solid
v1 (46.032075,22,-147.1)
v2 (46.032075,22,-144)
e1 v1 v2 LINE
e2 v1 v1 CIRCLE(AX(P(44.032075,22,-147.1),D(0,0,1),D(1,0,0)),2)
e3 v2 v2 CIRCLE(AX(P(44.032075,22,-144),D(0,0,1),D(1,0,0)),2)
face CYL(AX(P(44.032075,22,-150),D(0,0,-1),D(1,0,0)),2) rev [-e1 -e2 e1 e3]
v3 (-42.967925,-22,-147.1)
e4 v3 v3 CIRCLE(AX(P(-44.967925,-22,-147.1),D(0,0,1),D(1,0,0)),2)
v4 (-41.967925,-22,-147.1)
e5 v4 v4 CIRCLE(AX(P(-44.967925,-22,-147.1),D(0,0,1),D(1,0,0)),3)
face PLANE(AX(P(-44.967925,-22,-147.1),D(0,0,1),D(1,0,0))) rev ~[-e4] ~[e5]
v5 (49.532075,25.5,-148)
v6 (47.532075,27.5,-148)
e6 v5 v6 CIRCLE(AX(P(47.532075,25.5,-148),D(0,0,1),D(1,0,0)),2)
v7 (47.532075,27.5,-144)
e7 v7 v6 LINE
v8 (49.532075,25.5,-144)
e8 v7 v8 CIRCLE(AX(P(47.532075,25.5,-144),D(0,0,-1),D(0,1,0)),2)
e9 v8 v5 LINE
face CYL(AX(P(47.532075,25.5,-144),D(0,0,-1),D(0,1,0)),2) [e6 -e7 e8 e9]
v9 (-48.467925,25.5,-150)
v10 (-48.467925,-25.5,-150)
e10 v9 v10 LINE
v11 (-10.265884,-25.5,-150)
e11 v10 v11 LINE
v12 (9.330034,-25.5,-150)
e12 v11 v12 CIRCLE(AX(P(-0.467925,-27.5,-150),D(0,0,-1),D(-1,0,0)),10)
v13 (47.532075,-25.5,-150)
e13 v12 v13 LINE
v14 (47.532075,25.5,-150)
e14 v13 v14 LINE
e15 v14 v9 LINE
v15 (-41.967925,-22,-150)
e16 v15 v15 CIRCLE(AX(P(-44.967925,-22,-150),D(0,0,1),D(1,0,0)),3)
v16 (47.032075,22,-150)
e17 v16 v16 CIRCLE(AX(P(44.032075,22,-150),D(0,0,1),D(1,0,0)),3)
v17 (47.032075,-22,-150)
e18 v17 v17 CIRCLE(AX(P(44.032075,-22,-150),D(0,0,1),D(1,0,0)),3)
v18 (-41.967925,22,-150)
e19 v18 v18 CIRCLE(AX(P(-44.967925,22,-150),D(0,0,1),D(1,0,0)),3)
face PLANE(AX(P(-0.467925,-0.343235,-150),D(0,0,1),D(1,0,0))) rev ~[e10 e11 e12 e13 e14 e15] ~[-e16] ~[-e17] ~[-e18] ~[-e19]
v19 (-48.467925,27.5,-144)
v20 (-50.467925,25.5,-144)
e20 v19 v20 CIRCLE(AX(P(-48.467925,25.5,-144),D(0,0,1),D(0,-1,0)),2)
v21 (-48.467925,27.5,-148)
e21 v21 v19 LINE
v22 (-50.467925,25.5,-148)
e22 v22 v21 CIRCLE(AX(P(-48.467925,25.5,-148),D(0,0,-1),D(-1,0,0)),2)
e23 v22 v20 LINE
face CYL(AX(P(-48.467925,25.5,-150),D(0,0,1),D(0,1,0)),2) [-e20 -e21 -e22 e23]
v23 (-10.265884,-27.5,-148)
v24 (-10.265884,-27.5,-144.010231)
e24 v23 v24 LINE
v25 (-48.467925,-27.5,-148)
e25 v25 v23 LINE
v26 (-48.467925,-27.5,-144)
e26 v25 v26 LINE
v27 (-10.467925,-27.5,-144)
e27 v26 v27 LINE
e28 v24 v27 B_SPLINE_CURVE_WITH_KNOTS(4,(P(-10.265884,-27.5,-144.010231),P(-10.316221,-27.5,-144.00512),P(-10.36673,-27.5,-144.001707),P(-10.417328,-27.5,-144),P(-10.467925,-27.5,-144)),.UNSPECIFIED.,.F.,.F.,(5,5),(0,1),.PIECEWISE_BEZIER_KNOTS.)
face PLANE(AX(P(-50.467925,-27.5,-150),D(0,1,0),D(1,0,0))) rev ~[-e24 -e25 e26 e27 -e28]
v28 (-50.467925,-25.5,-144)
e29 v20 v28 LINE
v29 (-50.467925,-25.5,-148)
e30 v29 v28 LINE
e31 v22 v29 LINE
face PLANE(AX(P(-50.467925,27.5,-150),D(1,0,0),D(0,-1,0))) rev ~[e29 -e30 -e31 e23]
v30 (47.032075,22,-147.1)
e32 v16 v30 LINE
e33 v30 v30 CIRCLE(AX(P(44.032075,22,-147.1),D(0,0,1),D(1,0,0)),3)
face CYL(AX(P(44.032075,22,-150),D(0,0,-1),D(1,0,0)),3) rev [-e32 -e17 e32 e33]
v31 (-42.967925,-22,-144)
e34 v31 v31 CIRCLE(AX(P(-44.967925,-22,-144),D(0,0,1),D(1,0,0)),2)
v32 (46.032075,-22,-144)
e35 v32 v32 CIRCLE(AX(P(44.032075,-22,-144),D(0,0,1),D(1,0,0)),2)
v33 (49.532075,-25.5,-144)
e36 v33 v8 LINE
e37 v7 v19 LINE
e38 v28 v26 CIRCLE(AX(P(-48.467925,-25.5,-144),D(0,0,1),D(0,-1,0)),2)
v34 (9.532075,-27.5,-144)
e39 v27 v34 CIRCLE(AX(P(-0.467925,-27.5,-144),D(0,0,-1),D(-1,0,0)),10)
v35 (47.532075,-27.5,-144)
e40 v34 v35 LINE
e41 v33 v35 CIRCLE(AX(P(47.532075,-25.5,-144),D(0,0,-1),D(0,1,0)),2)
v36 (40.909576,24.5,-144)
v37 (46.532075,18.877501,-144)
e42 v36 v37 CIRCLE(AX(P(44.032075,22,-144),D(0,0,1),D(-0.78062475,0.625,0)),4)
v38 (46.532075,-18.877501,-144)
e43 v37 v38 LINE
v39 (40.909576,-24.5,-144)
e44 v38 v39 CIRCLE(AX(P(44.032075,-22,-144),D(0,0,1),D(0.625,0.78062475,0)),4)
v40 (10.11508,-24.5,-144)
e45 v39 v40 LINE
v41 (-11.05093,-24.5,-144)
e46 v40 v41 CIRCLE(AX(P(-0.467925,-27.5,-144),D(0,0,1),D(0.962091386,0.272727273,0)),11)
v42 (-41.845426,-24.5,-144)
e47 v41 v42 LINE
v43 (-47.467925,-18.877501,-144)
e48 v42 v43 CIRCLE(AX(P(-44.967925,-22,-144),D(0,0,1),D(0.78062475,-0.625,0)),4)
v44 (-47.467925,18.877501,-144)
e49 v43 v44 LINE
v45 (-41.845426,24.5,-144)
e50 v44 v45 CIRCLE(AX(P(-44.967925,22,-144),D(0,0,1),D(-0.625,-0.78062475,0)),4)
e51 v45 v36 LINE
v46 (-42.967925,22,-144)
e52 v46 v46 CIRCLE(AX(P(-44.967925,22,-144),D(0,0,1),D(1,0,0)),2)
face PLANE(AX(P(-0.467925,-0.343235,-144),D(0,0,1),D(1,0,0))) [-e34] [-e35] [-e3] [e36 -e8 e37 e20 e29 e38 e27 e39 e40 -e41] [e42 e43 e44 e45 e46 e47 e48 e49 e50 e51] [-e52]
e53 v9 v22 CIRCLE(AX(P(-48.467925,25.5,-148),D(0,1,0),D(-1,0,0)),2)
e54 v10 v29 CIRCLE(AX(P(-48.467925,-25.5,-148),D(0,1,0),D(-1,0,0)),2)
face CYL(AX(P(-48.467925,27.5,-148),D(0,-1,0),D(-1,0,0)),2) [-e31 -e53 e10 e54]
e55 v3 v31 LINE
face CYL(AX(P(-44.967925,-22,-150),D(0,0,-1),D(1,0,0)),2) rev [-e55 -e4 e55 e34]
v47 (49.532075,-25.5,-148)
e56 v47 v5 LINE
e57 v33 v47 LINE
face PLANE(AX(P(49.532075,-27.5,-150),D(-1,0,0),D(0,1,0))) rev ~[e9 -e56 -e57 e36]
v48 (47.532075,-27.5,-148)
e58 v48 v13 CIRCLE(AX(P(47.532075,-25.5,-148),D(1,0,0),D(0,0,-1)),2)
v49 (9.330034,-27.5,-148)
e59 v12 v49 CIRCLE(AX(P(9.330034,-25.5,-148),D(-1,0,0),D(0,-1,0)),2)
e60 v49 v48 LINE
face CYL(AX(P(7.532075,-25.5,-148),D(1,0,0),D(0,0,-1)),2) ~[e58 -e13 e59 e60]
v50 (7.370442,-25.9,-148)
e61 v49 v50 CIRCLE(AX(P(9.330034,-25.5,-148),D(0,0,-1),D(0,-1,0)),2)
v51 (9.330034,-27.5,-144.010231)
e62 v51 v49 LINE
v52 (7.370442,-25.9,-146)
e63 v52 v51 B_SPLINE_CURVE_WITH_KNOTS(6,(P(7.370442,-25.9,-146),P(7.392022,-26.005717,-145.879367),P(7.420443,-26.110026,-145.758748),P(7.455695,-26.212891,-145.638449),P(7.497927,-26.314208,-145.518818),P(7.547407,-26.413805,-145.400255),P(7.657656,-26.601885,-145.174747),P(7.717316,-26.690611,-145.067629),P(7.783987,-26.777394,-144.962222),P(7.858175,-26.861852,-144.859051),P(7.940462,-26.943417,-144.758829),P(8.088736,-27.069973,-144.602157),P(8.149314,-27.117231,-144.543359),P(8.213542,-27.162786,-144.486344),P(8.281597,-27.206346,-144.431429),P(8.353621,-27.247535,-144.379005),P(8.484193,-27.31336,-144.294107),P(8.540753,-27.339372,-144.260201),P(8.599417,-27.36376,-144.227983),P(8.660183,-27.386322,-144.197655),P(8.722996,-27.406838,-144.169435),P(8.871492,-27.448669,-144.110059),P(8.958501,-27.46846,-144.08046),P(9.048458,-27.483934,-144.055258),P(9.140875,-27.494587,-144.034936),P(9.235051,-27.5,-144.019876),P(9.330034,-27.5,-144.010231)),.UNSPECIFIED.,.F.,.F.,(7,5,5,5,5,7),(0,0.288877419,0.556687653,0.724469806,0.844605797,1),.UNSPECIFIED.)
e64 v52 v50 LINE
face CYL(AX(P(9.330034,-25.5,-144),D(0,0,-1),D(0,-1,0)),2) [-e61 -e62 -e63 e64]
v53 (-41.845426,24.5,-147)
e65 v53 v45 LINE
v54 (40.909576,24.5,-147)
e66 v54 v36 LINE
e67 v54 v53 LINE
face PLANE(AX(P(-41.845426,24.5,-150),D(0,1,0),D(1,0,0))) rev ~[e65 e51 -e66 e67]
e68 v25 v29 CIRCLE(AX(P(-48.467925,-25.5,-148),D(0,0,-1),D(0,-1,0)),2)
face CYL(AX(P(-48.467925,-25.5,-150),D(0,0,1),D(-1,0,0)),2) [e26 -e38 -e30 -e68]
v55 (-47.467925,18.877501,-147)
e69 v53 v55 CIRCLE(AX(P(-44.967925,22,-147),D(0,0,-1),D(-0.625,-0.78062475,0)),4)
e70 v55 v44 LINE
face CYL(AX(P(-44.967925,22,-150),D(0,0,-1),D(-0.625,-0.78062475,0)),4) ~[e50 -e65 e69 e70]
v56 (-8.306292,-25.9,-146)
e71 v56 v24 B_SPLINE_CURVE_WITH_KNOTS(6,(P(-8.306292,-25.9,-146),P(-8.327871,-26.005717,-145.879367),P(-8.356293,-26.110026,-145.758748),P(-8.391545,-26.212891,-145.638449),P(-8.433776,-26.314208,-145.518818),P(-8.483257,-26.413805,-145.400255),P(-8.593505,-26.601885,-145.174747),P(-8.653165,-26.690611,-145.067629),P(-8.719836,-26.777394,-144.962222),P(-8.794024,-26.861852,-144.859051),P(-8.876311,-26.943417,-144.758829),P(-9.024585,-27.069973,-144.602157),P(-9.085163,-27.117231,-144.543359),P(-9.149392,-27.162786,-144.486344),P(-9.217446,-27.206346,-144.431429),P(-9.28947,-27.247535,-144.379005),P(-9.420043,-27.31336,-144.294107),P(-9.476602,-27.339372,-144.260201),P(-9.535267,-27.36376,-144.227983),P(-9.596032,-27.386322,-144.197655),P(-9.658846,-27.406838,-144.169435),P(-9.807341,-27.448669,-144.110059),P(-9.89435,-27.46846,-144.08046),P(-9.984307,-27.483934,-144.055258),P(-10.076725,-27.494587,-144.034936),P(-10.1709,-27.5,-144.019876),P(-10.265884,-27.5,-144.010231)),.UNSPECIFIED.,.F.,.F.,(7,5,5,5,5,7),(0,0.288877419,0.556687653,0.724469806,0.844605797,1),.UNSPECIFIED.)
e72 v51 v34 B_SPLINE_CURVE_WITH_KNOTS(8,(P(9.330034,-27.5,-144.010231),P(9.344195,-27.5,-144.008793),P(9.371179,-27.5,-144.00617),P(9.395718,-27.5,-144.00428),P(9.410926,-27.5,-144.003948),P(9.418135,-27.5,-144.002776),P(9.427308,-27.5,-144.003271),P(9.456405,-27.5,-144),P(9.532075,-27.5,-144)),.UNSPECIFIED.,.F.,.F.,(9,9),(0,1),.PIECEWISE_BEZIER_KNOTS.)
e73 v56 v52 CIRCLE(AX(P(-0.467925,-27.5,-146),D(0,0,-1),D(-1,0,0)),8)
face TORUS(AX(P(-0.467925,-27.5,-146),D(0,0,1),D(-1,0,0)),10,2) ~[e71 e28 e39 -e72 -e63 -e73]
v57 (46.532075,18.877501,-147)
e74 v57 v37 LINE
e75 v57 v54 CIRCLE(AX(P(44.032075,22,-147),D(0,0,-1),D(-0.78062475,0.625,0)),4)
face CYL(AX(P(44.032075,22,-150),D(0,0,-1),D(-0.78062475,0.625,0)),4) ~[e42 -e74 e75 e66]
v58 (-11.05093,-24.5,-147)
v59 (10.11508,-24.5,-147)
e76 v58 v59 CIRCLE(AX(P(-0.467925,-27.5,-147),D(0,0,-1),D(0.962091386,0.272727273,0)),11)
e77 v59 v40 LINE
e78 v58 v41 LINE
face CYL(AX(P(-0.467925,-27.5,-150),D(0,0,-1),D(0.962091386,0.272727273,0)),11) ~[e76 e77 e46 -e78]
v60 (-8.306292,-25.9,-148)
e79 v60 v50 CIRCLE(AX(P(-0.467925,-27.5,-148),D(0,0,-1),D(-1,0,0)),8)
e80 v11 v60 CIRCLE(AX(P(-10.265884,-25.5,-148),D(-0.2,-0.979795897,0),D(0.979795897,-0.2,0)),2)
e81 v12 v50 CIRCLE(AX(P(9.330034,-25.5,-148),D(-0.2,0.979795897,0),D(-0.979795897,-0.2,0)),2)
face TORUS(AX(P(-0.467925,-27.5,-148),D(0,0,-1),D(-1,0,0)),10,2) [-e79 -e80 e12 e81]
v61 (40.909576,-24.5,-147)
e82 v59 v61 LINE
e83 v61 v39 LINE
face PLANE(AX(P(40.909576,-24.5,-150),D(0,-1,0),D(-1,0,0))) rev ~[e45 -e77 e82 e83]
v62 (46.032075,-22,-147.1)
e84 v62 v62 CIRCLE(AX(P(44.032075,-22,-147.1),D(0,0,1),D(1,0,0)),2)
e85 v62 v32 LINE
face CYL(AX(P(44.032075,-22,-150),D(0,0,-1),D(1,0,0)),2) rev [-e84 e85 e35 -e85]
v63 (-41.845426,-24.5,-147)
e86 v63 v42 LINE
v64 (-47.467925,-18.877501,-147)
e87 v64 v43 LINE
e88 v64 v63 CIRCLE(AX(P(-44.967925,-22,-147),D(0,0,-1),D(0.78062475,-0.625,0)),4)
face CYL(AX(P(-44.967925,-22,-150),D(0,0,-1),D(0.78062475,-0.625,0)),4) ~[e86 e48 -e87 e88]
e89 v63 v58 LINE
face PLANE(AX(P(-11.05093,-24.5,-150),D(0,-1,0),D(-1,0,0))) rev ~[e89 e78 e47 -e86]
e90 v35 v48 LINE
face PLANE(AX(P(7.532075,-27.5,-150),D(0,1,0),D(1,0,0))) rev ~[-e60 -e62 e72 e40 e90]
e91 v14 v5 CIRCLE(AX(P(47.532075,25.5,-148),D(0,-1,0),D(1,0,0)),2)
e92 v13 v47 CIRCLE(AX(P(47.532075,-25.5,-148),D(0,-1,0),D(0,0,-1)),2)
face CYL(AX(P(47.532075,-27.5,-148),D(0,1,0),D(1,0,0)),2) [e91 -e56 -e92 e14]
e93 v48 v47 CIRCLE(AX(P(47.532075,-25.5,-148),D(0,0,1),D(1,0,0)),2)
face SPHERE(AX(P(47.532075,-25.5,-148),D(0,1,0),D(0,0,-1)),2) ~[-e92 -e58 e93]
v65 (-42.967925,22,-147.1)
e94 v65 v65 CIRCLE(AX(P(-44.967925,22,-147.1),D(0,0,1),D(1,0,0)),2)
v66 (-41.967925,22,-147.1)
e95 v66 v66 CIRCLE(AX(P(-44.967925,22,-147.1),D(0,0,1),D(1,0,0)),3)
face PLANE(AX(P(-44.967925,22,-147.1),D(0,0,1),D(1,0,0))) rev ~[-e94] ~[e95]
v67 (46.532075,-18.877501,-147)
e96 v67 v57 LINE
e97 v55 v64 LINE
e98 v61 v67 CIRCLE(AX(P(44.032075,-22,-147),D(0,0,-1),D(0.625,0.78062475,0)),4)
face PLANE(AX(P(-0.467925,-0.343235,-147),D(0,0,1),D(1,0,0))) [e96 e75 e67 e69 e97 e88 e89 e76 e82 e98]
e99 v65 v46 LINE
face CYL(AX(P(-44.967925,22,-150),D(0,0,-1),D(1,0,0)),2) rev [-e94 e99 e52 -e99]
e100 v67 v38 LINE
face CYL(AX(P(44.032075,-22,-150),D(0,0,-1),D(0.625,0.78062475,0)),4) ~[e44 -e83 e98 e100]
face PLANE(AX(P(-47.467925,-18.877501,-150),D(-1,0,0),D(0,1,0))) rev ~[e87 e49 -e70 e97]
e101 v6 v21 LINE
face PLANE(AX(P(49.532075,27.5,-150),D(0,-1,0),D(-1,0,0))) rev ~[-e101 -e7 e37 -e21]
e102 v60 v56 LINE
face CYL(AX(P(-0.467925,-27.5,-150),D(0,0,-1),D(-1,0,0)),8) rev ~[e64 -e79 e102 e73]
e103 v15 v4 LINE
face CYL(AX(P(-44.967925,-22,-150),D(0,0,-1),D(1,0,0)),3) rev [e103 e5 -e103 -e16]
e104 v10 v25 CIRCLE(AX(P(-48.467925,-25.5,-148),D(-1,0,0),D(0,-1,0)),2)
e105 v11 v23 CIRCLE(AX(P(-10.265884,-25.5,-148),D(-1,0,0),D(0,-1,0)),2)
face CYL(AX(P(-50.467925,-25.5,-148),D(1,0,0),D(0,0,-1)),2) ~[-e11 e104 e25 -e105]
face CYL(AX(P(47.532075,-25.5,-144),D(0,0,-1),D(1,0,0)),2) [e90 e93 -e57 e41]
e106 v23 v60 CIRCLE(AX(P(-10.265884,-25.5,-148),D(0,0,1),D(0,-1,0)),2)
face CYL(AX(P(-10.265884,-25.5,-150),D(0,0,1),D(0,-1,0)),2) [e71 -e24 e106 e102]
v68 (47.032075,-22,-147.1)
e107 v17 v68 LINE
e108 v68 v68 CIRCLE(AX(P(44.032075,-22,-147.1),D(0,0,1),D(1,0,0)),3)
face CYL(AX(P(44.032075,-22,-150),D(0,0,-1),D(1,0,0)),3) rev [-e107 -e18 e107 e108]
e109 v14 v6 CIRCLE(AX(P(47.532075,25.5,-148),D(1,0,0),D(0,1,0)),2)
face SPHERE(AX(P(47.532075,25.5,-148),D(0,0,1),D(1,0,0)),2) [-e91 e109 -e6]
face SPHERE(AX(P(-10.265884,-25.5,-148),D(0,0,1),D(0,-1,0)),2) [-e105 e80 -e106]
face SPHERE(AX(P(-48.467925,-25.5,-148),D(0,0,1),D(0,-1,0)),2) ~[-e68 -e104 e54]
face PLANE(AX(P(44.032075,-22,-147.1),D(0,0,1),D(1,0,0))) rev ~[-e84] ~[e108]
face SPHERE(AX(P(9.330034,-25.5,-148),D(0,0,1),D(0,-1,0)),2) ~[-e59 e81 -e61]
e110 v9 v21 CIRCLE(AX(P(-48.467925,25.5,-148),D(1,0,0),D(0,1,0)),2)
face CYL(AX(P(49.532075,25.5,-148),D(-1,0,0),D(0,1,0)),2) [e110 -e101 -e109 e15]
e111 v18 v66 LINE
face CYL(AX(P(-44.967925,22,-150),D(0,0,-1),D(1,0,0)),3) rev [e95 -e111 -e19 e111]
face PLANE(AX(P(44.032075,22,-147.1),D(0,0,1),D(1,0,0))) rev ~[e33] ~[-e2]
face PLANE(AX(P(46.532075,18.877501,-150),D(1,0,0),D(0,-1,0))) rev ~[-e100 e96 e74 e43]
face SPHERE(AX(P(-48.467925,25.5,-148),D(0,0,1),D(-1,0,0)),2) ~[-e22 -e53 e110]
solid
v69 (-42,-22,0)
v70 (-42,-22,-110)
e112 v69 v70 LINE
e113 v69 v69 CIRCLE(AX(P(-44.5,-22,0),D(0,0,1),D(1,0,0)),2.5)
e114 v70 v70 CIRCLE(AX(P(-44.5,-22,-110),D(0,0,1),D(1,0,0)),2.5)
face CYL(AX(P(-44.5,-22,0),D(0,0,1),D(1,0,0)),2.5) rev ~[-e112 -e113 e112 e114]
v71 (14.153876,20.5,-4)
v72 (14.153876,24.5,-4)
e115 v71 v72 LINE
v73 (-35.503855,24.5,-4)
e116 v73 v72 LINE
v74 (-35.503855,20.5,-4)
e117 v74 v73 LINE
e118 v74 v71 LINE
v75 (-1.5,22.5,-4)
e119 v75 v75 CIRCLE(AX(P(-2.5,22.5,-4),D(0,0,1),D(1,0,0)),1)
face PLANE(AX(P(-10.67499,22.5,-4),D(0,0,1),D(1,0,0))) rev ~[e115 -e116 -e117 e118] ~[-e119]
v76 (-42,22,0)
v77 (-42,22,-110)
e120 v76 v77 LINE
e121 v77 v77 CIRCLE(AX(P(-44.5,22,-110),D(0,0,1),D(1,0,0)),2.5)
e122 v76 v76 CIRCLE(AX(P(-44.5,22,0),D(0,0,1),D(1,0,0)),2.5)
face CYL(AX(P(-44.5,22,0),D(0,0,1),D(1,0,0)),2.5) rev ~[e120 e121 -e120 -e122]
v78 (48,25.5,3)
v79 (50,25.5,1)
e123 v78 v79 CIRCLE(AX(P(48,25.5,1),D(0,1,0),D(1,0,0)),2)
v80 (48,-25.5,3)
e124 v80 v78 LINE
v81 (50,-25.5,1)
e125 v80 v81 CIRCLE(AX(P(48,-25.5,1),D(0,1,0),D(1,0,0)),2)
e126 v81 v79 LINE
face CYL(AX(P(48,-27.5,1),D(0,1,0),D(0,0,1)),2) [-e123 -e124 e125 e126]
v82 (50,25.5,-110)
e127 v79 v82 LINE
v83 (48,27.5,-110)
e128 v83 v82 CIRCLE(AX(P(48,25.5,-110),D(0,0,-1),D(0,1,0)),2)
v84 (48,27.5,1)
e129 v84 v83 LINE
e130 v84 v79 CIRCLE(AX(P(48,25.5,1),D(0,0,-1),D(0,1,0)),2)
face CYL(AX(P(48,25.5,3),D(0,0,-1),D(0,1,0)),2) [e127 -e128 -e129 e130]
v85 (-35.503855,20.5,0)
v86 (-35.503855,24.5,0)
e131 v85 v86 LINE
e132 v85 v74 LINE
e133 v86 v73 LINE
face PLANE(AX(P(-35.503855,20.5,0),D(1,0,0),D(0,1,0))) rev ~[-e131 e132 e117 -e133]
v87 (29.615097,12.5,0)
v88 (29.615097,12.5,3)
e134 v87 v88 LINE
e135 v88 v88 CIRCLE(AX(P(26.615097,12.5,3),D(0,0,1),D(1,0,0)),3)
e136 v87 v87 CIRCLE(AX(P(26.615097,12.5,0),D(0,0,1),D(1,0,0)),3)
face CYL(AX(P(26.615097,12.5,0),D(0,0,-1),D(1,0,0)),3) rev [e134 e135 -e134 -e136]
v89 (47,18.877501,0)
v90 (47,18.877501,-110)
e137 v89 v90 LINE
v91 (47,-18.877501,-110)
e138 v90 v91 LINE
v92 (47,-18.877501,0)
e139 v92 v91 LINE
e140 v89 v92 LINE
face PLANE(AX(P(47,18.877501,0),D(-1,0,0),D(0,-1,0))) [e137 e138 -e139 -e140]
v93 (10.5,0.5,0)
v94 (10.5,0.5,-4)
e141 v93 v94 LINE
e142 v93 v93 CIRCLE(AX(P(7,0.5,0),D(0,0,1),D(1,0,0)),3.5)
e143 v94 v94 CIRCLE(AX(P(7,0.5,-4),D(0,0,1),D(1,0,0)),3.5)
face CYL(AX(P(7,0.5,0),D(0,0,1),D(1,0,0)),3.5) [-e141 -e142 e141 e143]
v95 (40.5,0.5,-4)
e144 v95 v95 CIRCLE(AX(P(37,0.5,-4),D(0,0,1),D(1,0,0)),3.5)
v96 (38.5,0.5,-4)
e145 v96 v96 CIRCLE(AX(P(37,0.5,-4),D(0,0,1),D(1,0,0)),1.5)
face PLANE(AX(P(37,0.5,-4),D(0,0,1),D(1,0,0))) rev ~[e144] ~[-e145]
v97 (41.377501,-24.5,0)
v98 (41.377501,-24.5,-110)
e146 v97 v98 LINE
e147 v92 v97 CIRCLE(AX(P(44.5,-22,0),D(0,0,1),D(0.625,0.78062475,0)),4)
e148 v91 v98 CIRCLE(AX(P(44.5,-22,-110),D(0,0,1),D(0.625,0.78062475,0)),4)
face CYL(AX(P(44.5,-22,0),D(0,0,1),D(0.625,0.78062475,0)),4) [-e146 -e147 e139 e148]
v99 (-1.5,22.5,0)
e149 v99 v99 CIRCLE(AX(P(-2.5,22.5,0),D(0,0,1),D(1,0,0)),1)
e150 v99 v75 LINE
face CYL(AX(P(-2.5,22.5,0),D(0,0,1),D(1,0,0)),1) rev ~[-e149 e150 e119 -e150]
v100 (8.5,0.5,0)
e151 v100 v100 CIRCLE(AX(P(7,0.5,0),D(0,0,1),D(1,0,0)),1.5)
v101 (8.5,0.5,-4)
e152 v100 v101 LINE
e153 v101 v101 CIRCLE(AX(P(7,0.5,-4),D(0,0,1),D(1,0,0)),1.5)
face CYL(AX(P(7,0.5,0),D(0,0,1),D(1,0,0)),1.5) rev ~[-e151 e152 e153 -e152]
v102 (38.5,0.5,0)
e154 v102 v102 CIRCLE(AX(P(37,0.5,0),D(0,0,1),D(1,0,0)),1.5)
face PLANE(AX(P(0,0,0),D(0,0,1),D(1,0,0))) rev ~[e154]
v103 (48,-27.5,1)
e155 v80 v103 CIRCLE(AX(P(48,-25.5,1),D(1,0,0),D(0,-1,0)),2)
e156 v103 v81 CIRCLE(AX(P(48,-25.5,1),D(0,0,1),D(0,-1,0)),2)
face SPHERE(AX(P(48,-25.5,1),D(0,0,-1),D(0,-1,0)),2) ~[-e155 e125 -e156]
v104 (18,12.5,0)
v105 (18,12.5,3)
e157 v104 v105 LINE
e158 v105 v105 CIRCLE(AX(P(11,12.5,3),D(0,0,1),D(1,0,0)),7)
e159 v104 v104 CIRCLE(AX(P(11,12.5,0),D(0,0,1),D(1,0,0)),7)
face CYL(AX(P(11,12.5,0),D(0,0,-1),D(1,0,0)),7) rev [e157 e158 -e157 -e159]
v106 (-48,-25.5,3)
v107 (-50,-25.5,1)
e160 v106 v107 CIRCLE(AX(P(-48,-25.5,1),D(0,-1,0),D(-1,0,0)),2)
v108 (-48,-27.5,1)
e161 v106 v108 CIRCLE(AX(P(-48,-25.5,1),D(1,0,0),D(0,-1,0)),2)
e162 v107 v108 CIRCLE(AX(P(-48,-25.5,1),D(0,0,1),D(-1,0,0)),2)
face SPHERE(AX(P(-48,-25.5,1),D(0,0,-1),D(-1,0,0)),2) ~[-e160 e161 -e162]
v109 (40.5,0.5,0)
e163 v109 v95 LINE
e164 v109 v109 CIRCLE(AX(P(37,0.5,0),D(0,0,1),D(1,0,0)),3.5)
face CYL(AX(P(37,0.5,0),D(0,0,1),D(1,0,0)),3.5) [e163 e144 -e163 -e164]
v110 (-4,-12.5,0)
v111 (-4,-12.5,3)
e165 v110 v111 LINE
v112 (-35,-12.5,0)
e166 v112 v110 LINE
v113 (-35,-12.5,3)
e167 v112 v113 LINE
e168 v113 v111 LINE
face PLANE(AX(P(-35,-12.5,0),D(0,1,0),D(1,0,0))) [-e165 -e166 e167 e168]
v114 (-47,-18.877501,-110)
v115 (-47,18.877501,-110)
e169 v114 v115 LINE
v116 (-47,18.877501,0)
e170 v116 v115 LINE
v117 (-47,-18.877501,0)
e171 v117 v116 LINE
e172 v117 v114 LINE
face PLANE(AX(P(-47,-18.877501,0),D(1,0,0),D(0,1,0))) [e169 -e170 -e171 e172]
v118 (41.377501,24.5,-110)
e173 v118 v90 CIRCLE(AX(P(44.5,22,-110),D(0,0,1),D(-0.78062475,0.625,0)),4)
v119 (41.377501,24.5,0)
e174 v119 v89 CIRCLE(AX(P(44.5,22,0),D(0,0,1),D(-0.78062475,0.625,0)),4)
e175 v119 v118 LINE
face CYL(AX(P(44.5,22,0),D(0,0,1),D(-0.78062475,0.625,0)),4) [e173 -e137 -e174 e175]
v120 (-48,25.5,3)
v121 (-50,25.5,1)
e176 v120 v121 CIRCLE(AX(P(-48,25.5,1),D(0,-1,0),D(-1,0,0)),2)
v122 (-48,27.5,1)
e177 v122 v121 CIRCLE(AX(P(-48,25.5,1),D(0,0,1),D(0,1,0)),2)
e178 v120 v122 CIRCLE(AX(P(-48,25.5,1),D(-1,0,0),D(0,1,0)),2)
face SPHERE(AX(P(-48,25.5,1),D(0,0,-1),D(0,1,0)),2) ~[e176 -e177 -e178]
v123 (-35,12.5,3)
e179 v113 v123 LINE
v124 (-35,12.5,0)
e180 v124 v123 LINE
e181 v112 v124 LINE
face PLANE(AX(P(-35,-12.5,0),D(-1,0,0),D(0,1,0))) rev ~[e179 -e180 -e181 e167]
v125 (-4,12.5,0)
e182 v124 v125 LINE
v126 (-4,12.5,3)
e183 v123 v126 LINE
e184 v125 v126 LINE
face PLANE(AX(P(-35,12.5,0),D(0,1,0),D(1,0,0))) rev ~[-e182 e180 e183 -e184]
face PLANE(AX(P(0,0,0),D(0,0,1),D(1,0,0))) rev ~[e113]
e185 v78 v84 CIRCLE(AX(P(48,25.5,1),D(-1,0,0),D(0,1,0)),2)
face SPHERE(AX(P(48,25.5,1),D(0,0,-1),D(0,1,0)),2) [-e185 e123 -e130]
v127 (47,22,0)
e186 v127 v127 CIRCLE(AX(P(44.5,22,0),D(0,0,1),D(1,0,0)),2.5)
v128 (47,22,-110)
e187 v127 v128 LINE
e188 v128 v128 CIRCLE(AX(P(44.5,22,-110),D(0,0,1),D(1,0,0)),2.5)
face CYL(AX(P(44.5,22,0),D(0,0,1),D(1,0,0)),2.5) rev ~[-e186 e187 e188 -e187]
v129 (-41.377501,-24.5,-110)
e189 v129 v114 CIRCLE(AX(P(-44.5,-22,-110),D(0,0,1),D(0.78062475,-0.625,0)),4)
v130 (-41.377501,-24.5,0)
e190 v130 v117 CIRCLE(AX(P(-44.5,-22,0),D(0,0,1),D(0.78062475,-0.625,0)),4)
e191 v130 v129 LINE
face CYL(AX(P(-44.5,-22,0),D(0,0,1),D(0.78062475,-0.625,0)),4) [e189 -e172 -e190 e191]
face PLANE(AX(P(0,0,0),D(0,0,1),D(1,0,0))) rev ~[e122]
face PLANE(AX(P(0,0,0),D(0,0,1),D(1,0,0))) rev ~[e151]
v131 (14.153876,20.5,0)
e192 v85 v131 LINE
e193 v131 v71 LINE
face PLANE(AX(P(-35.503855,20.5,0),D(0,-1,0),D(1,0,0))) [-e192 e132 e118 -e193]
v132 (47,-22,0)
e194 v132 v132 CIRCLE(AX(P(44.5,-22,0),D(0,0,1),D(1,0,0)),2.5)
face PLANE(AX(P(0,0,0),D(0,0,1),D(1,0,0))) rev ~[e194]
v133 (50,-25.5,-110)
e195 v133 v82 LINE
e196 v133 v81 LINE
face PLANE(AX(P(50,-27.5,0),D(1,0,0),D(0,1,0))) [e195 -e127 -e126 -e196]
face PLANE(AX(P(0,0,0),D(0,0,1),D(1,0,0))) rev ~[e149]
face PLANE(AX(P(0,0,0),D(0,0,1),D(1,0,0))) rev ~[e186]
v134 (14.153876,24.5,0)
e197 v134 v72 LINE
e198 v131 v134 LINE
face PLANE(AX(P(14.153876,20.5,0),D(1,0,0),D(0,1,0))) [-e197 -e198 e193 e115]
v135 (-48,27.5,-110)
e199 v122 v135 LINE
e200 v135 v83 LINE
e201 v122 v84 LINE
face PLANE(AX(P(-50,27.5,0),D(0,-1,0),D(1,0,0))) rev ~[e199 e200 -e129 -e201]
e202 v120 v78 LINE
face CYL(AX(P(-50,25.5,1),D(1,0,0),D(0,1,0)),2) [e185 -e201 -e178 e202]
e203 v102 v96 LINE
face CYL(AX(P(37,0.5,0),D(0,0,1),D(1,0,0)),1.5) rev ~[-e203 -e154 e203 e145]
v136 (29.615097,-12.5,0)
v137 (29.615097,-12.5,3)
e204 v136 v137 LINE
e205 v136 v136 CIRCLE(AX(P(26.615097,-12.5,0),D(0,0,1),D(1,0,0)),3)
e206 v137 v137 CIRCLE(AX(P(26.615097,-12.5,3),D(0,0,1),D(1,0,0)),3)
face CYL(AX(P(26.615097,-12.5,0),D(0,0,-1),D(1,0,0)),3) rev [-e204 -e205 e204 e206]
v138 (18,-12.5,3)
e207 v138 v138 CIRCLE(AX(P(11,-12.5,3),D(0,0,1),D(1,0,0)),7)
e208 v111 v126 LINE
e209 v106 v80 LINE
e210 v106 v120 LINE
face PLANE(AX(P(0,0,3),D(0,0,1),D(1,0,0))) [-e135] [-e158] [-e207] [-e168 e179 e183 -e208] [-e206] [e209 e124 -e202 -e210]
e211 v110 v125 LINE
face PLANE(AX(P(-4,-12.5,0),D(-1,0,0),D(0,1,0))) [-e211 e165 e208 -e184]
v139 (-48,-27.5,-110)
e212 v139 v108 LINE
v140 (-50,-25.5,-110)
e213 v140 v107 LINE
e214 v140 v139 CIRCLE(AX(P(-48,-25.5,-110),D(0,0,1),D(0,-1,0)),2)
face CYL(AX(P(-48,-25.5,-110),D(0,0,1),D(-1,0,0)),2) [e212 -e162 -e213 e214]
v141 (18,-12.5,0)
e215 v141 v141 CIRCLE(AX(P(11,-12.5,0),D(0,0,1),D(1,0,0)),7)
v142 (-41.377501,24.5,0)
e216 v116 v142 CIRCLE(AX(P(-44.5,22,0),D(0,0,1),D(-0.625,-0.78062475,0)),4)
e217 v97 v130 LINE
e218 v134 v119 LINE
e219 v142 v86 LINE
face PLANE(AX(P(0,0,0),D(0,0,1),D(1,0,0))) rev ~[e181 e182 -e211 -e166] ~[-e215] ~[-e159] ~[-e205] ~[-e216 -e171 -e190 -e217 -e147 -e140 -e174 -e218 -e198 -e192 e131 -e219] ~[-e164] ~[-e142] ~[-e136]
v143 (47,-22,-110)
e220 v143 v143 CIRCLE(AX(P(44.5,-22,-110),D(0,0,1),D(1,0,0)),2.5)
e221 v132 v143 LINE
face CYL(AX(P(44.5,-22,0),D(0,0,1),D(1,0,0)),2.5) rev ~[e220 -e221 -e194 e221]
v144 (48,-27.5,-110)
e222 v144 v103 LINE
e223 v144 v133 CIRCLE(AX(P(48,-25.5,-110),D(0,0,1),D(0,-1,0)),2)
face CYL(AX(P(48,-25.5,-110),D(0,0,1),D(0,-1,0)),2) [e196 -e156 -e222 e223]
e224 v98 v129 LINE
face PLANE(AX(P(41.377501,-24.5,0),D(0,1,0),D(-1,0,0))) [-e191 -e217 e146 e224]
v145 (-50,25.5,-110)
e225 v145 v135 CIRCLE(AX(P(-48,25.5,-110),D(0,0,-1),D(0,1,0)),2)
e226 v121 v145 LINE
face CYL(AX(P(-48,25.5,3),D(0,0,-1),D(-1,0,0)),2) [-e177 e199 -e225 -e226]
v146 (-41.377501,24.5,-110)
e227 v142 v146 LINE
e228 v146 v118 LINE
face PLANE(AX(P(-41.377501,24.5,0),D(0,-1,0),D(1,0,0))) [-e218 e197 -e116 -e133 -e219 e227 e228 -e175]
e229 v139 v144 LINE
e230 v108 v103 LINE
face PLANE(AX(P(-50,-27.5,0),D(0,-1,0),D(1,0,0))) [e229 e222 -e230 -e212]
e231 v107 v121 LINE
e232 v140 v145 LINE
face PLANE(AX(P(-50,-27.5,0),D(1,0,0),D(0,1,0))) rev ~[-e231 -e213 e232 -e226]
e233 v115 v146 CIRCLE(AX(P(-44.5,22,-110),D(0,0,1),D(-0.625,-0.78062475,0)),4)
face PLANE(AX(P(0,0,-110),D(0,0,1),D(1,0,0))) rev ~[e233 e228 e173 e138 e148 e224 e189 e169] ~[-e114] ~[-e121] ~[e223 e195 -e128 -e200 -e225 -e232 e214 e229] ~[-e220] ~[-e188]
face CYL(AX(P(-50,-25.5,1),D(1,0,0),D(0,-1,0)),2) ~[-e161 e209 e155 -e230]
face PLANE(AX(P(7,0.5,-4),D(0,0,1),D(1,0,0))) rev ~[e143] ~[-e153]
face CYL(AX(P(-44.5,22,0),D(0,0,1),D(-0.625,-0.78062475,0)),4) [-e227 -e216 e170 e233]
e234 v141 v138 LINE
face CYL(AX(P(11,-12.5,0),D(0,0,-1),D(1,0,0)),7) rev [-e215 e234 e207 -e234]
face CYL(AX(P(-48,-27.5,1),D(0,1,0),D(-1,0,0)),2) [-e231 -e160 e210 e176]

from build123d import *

# Parameters (mm, degrees)
F0_W      = 100
F0_H      = 55
F0_R      = 2.5
F0_R_2    = 7
F0_R_3    = 3
F0_W_2    = 31
F0_H_2    = 25
F1_DEPTH  = 3
F2_DEPTH  = 110
F3_R      = 3.5
F3_R_2    = 1.5
F3_W      = 49.6577308513
F3_H      = 4
F3_R_3    = 1
F4_DEPTH  = 4
F5_R      = 2
F7_R      = 3
F8_DEPTH  = 3
F7_R_2    = 2
F9_DEPTH  = 6
F11_DEPTH = 2.9
F12_R     = 2


# Not quite as in the source:
# - a feature of the source that left no trace in its solid (it failed there, or was rolled back) is left out
# - a feature names something its author has since deleted; it is built from what else it names


with BuildPart() as f1:
    # F0 (on Top) → F1 (new body)
    with BuildSketch(Plane.XY):
        Rectangle(F0_W, F0_H)
        with Locations((-44.5, -22)):
            Circle(F0_R, mode=Mode.SUBTRACT)
        with Locations((44.5, -22)):
            Circle(F0_R, mode=Mode.SUBTRACT)
        with Locations((-44.5, 22)):
            Circle(F0_R, mode=Mode.SUBTRACT)
        with BuildLine():
            ThreePointArc((-47, 18.8775010008), (-41.6715728753, 19.1715728753), (-41.3775010008, 24.5))
            Line((-41.3775010008, 24.5), (41.3775010008, 24.5))
            ThreePointArc((41.3775010008, 24.5), (41.6715728753, 19.1715728753), (47, 18.8775010008))
            Line((47, 18.8775010008), (47, -18.8775010008))
            ThreePointArc((47, -18.8775010008), (41.6715728753, -19.1715728753), (41.3775010008, -24.5))
            Line((41.3775010008, -24.5), (-41.3775010008, -24.5))
            ThreePointArc((-41.3775010008, -24.5), (-41.6715728753, -19.1715728753), (-47, -18.8775010008))
            Line((-47, -18.8775010008), (-47, 18.8775010008))
        make_face(mode=Mode.SUBTRACT)
        with Locations((44.5, 22)):
            Circle(F0_R, mode=Mode.SUBTRACT)
        with BuildLine():
            Line((41.3775010008, 24.5), (-41.3775010008, 24.5))
            ThreePointArc((-41.3775010008, 24.5), (-41.6715728753, 19.1715728753), (-47, 18.8775010008))
            Line((-47, 18.8775010008), (-47, -18.8775010008))
            ThreePointArc((-47, -18.8775010008), (-41.6715728753, -19.1715728753), (-41.3775010008, -24.5))
            Line((-41.3775010008, -24.5), (41.3775010008, -24.5))
            ThreePointArc((41.3775010008, -24.5), (41.6715728753, -19.1715728753), (47, -18.8775010008))
            Line((47, -18.8775010008), (47, 18.8775010008))
            ThreePointArc((47, 18.8775010008), (41.6715728753, 19.1715728753), (41.3775010008, 24.5))
        make_face()
        with Locations((11, -12.5)):
            Circle(F0_R_2, mode=Mode.SUBTRACT)
        with Locations((26.6150971745, -12.5)):
            Circle(F0_R_3, mode=Mode.SUBTRACT)
        with Locations((-19.5, 0)):
            Rectangle(F0_W_2, F0_H_2, mode=Mode.SUBTRACT)
        with Locations((11, 12.5)):
            Circle(F0_R_2, mode=Mode.SUBTRACT)
        with Locations((26.6150971745, 12.5)):
            Circle(F0_R_3, mode=Mode.SUBTRACT)
        with Locations((-44.5, 22)):
            Circle(F0_R)
        with Locations((-44.5, -22)):
            Circle(F0_R)
        with Locations((44.5, -22)):
            Circle(F0_R)
        with Locations((44.5, 22)):
            Circle(F0_R)
    extrude(amount=F1_DEPTH)

    # F0 (on Top) → F2 (join)
    with BuildSketch(Plane.XY):
        Rectangle(F0_W, F0_H)
        with Locations((-44.5, -22)):
            Circle(F0_R, mode=Mode.SUBTRACT)
        with Locations((44.5, -22)):
            Circle(F0_R, mode=Mode.SUBTRACT)
        with Locations((-44.5, 22)):
            Circle(F0_R, mode=Mode.SUBTRACT)
        with BuildLine():
            ThreePointArc((-47, 18.8775010008), (-41.6715728753, 19.1715728753), (-41.3775010008, 24.5))
            Line((-41.3775010008, 24.5), (41.3775010008, 24.5))
            ThreePointArc((41.3775010008, 24.5), (41.6715728753, 19.1715728753), (47, 18.8775010008))
            Line((47, 18.8775010008), (47, -18.8775010008))
            ThreePointArc((47, -18.8775010008), (41.6715728753, -19.1715728753), (41.3775010008, -24.5))
            Line((41.3775010008, -24.5), (-41.3775010008, -24.5))
            ThreePointArc((-41.3775010008, -24.5), (-41.6715728753, -19.1715728753), (-47, -18.8775010008))
            Line((-47, -18.8775010008), (-47, 18.8775010008))
        make_face(mode=Mode.SUBTRACT)
        with Locations((44.5, 22)):
            Circle(F0_R, mode=Mode.SUBTRACT)
    extrude(amount=-F2_DEPTH)

    # F3 (on face) → F4 (join)
    with BuildSketch(Plane.XY):
        with Locations((37, 0.5)):
            Circle(F3_R)
        with Locations((37, 0.5)):
            Circle(F3_R_2, mode=Mode.SUBTRACT)
        with Locations((7, 0.5)):
            Circle(F3_R)
        with Locations((7, 0.5)):
            Circle(F3_R_2, mode=Mode.SUBTRACT)
        with Locations((-10.6749895494, 22.5)):
            Rectangle(F3_W, F3_H)
        with Locations((-2.5, 22.5)):
            Circle(F3_R_3, mode=Mode.SUBTRACT)
    extrude(amount=-F4_DEPTH)

    # F5
    f5_edges = [f1.edges().sort_by_distance(p)[0] for p in [
        (50, 27.5, -53.5),
        (-50, 27.5, -53.5),
        (-50, -27.5, -53.5),
        (50, -27.5, -53.5),
        (0, 27.5, 3),
        (-50, 0, 3),
        (0, -27.5, 3),
        (50, 0, 3),
    ]]
    fillet(f5_edges, radius=F5_R)


with BuildPart() as f8:
    # F7 (on offset) → F8 (new body)
    with BuildSketch(Plane.XY.offset(-150)):
        with BuildLine():
            Line((49.5320752355, 27.5), (-50.4679247645, 27.5))
            Line((-50.4679247645, 27.5), (-50.4679247645, -27.5))
            Line((-50.4679247645, -27.5), (-8.4679247645, -27.5))
            ThreePointArc((-8.4679247645, -27.5), (-0.4679247645, -19.5), (7.5320752355, -27.5))
            Line((7.5320752355, -27.5), (49.5320752355, -27.5))
            Line((49.5320752355, -27.5), (49.5320752355, 27.5))
        make_face()
        with Locations((-44.9679247645, -22)):
            Circle(F7_R, mode=Mode.SUBTRACT)
        with Locations((44.0320752355, -22)):
            Circle(F7_R, mode=Mode.SUBTRACT)
        with Locations((-44.9679247645, 22)):
            Circle(F7_R, mode=Mode.SUBTRACT)
        with BuildLine():
            ThreePointArc((-47.4679247645, 18.8775010008), (-42.1394976398, 19.1715728753), (-41.8454257653, 24.5))
            Line((-41.8454257653, 24.5), (40.9095762363, 24.5))
            ThreePointArc((40.9095762363, 24.5), (41.2036481107, 19.1715728753), (46.5320752355, 18.8775010008))
            Line((46.5320752355, 18.8775010008), (46.5320752355, -18.8775010008))
            ThreePointArc((46.5320752355, -18.8775010008), (41.2036481107, -19.1715728753), (40.9095762363, -24.5))
            Line((40.9095762363, -24.5), (10.1150804797, -24.5))
            ThreePointArc((10.1150804797, -24.5), (-0.4679247645, -16.5), (-11.0509300088, -24.5))
            Line((-11.0509300088, -24.5), (-41.8454257653, -24.5))
            ThreePointArc((-41.8454257653, -24.5), (-42.1394976398, -19.1715728753), (-47.4679247645, -18.8775010008))
            Line((-47.4679247645, -18.8775010008), (-47.4679247645, 18.8775010008))
        make_face(mode=Mode.SUBTRACT)
        with Locations((44.0320752355, 22)):
            Circle(F7_R, mode=Mode.SUBTRACT)
        with BuildLine():
            Line((40.9095762363, 24.5), (-41.8454257653, 24.5))
            ThreePointArc((-41.8454257653, 24.5), (-42.1394976398, 19.1715728753), (-47.4679247645, 18.8775010008))
            Line((-47.4679247645, 18.8775010008), (-47.4679247645, -18.8775010008))
            ThreePointArc((-47.4679247645, -18.8775010008), (-42.1394976398, -19.1715728753), (-41.8454257653, -24.5))
            Line((-41.8454257653, -24.5), (-11.0509300088, -24.5))
            ThreePointArc((-11.0509300088, -24.5), (-0.4679247645, -16.5), (10.1150804797, -24.5))
            Line((10.1150804797, -24.5), (40.9095762363, -24.5))
            ThreePointArc((40.9095762363, -24.5), (41.2036481107, -19.1715728753), (46.5320752355, -18.8775010008))
            Line((46.5320752355, -18.8775010008), (46.5320752355, 18.8775010008))
            ThreePointArc((46.5320752355, 18.8775010008), (41.2036481107, 19.1715728753), (40.9095762363, 24.5))
        make_face()
    extrude(amount=F8_DEPTH)

    # F7 (on offset) → F9 (join)
    with BuildSketch(Plane.XY.offset(-150)):
        with BuildLine():
            Line((49.5320752355, 27.5), (-50.4679247645, 27.5))
            Line((-50.4679247645, 27.5), (-50.4679247645, -27.5))
            Line((-50.4679247645, -27.5), (-8.4679247645, -27.5))
            ThreePointArc((-8.4679247645, -27.5), (-0.4679247645, -19.5), (7.5320752355, -27.5))
            Line((7.5320752355, -27.5), (49.5320752355, -27.5))
            Line((49.5320752355, -27.5), (49.5320752355, 27.5))
        make_face()
        with Locations((-44.9679247645, -22)):
            Circle(F7_R, mode=Mode.SUBTRACT)
        with Locations((44.0320752355, -22)):
            Circle(F7_R, mode=Mode.SUBTRACT)
        with Locations((-44.9679247645, 22)):
            Circle(F7_R, mode=Mode.SUBTRACT)
        with BuildLine():
            ThreePointArc((-47.4679247645, 18.8775010008), (-42.1394976398, 19.1715728753), (-41.8454257653, 24.5))
            Line((-41.8454257653, 24.5), (40.9095762363, 24.5))
            ThreePointArc((40.9095762363, 24.5), (41.2036481107, 19.1715728753), (46.5320752355, 18.8775010008))
            Line((46.5320752355, 18.8775010008), (46.5320752355, -18.8775010008))
            ThreePointArc((46.5320752355, -18.8775010008), (41.2036481107, -19.1715728753), (40.9095762363, -24.5))
            Line((40.9095762363, -24.5), (10.1150804797, -24.5))
            ThreePointArc((10.1150804797, -24.5), (-0.4679247645, -16.5), (-11.0509300088, -24.5))
            Line((-11.0509300088, -24.5), (-41.8454257653, -24.5))
            ThreePointArc((-41.8454257653, -24.5), (-42.1394976398, -19.1715728753), (-47.4679247645, -18.8775010008))
            Line((-47.4679247645, -18.8775010008), (-47.4679247645, 18.8775010008))
        make_face(mode=Mode.SUBTRACT)
        with Locations((44.0320752355, 22)):
            Circle(F7_R, mode=Mode.SUBTRACT)
        with Locations((-44.9679247645, -22)):
            Circle(F7_R)
        with Locations((-44.9679247645, -22)):
            Circle(F7_R_2, mode=Mode.SUBTRACT)
        with Locations((-44.9679247645, 22)):
            Circle(F7_R)
        with Locations((-44.9679247645, 22)):
            Circle(F7_R_2, mode=Mode.SUBTRACT)
        with Locations((44.0320752355, 22)):
            Circle(F7_R)
        with Locations((44.0320752355, 22)):
            Circle(F7_R_2, mode=Mode.SUBTRACT)
        with Locations((44.0320752355, -22)):
            Circle(F7_R)
        with Locations((44.0320752355, -22)):
            Circle(F7_R_2, mode=Mode.SUBTRACT)
    extrude(amount=F9_DEPTH)

    # F7 (on offset) → F11 (cut)
    with BuildSketch(Plane.XY.offset(-150)):
        with Locations((-44.9679247645, 22)):
            Circle(F7_R)
        with Locations((-44.9679247645, 22)):
            Circle(F7_R_2, mode=Mode.SUBTRACT)
        with Locations((44.0320752355, 22)):
            Circle(F7_R)
        with Locations((44.0320752355, 22)):
            Circle(F7_R_2, mode=Mode.SUBTRACT)
        with Locations((44.0320752355, -22)):
            Circle(F7_R)
        with Locations((44.0320752355, -22)):
            Circle(F7_R_2, mode=Mode.SUBTRACT)
        with Locations((-44.9679247645, -22)):
            Circle(F7_R)
        with Locations((-44.9679247645, -22)):
            Circle(F7_R_2, mode=Mode.SUBTRACT)
    extrude(amount=F11_DEPTH, mode=Mode.SUBTRACT)

    # F12
    f12_edges = [f8.edges().sort_by_distance(p)[0] for p in [
        (-50.467925, -27.5, -147),
        (-50.467925, 27.5, -147),
        (49.532075, 27.5, -147),
        (49.532075, 0, -150),
        (-29.467925, -27.5, -150),
        (-50.467925, 0, -150),
        (-0.467925, 27.5, -150),
        (7.532075, -27.5, -147),
        (28.532075, -27.5, -150),
        (-0.467925, -19.5, -150),
        (-0.467925, -19.5, -144),
        (49.532075, -27.5, -147),
        (-8.467925, -27.5, -147),
    ]]
    fillet(f12_edges, radius=F12_R)


solid = Compound([f1.part, f8.part])
